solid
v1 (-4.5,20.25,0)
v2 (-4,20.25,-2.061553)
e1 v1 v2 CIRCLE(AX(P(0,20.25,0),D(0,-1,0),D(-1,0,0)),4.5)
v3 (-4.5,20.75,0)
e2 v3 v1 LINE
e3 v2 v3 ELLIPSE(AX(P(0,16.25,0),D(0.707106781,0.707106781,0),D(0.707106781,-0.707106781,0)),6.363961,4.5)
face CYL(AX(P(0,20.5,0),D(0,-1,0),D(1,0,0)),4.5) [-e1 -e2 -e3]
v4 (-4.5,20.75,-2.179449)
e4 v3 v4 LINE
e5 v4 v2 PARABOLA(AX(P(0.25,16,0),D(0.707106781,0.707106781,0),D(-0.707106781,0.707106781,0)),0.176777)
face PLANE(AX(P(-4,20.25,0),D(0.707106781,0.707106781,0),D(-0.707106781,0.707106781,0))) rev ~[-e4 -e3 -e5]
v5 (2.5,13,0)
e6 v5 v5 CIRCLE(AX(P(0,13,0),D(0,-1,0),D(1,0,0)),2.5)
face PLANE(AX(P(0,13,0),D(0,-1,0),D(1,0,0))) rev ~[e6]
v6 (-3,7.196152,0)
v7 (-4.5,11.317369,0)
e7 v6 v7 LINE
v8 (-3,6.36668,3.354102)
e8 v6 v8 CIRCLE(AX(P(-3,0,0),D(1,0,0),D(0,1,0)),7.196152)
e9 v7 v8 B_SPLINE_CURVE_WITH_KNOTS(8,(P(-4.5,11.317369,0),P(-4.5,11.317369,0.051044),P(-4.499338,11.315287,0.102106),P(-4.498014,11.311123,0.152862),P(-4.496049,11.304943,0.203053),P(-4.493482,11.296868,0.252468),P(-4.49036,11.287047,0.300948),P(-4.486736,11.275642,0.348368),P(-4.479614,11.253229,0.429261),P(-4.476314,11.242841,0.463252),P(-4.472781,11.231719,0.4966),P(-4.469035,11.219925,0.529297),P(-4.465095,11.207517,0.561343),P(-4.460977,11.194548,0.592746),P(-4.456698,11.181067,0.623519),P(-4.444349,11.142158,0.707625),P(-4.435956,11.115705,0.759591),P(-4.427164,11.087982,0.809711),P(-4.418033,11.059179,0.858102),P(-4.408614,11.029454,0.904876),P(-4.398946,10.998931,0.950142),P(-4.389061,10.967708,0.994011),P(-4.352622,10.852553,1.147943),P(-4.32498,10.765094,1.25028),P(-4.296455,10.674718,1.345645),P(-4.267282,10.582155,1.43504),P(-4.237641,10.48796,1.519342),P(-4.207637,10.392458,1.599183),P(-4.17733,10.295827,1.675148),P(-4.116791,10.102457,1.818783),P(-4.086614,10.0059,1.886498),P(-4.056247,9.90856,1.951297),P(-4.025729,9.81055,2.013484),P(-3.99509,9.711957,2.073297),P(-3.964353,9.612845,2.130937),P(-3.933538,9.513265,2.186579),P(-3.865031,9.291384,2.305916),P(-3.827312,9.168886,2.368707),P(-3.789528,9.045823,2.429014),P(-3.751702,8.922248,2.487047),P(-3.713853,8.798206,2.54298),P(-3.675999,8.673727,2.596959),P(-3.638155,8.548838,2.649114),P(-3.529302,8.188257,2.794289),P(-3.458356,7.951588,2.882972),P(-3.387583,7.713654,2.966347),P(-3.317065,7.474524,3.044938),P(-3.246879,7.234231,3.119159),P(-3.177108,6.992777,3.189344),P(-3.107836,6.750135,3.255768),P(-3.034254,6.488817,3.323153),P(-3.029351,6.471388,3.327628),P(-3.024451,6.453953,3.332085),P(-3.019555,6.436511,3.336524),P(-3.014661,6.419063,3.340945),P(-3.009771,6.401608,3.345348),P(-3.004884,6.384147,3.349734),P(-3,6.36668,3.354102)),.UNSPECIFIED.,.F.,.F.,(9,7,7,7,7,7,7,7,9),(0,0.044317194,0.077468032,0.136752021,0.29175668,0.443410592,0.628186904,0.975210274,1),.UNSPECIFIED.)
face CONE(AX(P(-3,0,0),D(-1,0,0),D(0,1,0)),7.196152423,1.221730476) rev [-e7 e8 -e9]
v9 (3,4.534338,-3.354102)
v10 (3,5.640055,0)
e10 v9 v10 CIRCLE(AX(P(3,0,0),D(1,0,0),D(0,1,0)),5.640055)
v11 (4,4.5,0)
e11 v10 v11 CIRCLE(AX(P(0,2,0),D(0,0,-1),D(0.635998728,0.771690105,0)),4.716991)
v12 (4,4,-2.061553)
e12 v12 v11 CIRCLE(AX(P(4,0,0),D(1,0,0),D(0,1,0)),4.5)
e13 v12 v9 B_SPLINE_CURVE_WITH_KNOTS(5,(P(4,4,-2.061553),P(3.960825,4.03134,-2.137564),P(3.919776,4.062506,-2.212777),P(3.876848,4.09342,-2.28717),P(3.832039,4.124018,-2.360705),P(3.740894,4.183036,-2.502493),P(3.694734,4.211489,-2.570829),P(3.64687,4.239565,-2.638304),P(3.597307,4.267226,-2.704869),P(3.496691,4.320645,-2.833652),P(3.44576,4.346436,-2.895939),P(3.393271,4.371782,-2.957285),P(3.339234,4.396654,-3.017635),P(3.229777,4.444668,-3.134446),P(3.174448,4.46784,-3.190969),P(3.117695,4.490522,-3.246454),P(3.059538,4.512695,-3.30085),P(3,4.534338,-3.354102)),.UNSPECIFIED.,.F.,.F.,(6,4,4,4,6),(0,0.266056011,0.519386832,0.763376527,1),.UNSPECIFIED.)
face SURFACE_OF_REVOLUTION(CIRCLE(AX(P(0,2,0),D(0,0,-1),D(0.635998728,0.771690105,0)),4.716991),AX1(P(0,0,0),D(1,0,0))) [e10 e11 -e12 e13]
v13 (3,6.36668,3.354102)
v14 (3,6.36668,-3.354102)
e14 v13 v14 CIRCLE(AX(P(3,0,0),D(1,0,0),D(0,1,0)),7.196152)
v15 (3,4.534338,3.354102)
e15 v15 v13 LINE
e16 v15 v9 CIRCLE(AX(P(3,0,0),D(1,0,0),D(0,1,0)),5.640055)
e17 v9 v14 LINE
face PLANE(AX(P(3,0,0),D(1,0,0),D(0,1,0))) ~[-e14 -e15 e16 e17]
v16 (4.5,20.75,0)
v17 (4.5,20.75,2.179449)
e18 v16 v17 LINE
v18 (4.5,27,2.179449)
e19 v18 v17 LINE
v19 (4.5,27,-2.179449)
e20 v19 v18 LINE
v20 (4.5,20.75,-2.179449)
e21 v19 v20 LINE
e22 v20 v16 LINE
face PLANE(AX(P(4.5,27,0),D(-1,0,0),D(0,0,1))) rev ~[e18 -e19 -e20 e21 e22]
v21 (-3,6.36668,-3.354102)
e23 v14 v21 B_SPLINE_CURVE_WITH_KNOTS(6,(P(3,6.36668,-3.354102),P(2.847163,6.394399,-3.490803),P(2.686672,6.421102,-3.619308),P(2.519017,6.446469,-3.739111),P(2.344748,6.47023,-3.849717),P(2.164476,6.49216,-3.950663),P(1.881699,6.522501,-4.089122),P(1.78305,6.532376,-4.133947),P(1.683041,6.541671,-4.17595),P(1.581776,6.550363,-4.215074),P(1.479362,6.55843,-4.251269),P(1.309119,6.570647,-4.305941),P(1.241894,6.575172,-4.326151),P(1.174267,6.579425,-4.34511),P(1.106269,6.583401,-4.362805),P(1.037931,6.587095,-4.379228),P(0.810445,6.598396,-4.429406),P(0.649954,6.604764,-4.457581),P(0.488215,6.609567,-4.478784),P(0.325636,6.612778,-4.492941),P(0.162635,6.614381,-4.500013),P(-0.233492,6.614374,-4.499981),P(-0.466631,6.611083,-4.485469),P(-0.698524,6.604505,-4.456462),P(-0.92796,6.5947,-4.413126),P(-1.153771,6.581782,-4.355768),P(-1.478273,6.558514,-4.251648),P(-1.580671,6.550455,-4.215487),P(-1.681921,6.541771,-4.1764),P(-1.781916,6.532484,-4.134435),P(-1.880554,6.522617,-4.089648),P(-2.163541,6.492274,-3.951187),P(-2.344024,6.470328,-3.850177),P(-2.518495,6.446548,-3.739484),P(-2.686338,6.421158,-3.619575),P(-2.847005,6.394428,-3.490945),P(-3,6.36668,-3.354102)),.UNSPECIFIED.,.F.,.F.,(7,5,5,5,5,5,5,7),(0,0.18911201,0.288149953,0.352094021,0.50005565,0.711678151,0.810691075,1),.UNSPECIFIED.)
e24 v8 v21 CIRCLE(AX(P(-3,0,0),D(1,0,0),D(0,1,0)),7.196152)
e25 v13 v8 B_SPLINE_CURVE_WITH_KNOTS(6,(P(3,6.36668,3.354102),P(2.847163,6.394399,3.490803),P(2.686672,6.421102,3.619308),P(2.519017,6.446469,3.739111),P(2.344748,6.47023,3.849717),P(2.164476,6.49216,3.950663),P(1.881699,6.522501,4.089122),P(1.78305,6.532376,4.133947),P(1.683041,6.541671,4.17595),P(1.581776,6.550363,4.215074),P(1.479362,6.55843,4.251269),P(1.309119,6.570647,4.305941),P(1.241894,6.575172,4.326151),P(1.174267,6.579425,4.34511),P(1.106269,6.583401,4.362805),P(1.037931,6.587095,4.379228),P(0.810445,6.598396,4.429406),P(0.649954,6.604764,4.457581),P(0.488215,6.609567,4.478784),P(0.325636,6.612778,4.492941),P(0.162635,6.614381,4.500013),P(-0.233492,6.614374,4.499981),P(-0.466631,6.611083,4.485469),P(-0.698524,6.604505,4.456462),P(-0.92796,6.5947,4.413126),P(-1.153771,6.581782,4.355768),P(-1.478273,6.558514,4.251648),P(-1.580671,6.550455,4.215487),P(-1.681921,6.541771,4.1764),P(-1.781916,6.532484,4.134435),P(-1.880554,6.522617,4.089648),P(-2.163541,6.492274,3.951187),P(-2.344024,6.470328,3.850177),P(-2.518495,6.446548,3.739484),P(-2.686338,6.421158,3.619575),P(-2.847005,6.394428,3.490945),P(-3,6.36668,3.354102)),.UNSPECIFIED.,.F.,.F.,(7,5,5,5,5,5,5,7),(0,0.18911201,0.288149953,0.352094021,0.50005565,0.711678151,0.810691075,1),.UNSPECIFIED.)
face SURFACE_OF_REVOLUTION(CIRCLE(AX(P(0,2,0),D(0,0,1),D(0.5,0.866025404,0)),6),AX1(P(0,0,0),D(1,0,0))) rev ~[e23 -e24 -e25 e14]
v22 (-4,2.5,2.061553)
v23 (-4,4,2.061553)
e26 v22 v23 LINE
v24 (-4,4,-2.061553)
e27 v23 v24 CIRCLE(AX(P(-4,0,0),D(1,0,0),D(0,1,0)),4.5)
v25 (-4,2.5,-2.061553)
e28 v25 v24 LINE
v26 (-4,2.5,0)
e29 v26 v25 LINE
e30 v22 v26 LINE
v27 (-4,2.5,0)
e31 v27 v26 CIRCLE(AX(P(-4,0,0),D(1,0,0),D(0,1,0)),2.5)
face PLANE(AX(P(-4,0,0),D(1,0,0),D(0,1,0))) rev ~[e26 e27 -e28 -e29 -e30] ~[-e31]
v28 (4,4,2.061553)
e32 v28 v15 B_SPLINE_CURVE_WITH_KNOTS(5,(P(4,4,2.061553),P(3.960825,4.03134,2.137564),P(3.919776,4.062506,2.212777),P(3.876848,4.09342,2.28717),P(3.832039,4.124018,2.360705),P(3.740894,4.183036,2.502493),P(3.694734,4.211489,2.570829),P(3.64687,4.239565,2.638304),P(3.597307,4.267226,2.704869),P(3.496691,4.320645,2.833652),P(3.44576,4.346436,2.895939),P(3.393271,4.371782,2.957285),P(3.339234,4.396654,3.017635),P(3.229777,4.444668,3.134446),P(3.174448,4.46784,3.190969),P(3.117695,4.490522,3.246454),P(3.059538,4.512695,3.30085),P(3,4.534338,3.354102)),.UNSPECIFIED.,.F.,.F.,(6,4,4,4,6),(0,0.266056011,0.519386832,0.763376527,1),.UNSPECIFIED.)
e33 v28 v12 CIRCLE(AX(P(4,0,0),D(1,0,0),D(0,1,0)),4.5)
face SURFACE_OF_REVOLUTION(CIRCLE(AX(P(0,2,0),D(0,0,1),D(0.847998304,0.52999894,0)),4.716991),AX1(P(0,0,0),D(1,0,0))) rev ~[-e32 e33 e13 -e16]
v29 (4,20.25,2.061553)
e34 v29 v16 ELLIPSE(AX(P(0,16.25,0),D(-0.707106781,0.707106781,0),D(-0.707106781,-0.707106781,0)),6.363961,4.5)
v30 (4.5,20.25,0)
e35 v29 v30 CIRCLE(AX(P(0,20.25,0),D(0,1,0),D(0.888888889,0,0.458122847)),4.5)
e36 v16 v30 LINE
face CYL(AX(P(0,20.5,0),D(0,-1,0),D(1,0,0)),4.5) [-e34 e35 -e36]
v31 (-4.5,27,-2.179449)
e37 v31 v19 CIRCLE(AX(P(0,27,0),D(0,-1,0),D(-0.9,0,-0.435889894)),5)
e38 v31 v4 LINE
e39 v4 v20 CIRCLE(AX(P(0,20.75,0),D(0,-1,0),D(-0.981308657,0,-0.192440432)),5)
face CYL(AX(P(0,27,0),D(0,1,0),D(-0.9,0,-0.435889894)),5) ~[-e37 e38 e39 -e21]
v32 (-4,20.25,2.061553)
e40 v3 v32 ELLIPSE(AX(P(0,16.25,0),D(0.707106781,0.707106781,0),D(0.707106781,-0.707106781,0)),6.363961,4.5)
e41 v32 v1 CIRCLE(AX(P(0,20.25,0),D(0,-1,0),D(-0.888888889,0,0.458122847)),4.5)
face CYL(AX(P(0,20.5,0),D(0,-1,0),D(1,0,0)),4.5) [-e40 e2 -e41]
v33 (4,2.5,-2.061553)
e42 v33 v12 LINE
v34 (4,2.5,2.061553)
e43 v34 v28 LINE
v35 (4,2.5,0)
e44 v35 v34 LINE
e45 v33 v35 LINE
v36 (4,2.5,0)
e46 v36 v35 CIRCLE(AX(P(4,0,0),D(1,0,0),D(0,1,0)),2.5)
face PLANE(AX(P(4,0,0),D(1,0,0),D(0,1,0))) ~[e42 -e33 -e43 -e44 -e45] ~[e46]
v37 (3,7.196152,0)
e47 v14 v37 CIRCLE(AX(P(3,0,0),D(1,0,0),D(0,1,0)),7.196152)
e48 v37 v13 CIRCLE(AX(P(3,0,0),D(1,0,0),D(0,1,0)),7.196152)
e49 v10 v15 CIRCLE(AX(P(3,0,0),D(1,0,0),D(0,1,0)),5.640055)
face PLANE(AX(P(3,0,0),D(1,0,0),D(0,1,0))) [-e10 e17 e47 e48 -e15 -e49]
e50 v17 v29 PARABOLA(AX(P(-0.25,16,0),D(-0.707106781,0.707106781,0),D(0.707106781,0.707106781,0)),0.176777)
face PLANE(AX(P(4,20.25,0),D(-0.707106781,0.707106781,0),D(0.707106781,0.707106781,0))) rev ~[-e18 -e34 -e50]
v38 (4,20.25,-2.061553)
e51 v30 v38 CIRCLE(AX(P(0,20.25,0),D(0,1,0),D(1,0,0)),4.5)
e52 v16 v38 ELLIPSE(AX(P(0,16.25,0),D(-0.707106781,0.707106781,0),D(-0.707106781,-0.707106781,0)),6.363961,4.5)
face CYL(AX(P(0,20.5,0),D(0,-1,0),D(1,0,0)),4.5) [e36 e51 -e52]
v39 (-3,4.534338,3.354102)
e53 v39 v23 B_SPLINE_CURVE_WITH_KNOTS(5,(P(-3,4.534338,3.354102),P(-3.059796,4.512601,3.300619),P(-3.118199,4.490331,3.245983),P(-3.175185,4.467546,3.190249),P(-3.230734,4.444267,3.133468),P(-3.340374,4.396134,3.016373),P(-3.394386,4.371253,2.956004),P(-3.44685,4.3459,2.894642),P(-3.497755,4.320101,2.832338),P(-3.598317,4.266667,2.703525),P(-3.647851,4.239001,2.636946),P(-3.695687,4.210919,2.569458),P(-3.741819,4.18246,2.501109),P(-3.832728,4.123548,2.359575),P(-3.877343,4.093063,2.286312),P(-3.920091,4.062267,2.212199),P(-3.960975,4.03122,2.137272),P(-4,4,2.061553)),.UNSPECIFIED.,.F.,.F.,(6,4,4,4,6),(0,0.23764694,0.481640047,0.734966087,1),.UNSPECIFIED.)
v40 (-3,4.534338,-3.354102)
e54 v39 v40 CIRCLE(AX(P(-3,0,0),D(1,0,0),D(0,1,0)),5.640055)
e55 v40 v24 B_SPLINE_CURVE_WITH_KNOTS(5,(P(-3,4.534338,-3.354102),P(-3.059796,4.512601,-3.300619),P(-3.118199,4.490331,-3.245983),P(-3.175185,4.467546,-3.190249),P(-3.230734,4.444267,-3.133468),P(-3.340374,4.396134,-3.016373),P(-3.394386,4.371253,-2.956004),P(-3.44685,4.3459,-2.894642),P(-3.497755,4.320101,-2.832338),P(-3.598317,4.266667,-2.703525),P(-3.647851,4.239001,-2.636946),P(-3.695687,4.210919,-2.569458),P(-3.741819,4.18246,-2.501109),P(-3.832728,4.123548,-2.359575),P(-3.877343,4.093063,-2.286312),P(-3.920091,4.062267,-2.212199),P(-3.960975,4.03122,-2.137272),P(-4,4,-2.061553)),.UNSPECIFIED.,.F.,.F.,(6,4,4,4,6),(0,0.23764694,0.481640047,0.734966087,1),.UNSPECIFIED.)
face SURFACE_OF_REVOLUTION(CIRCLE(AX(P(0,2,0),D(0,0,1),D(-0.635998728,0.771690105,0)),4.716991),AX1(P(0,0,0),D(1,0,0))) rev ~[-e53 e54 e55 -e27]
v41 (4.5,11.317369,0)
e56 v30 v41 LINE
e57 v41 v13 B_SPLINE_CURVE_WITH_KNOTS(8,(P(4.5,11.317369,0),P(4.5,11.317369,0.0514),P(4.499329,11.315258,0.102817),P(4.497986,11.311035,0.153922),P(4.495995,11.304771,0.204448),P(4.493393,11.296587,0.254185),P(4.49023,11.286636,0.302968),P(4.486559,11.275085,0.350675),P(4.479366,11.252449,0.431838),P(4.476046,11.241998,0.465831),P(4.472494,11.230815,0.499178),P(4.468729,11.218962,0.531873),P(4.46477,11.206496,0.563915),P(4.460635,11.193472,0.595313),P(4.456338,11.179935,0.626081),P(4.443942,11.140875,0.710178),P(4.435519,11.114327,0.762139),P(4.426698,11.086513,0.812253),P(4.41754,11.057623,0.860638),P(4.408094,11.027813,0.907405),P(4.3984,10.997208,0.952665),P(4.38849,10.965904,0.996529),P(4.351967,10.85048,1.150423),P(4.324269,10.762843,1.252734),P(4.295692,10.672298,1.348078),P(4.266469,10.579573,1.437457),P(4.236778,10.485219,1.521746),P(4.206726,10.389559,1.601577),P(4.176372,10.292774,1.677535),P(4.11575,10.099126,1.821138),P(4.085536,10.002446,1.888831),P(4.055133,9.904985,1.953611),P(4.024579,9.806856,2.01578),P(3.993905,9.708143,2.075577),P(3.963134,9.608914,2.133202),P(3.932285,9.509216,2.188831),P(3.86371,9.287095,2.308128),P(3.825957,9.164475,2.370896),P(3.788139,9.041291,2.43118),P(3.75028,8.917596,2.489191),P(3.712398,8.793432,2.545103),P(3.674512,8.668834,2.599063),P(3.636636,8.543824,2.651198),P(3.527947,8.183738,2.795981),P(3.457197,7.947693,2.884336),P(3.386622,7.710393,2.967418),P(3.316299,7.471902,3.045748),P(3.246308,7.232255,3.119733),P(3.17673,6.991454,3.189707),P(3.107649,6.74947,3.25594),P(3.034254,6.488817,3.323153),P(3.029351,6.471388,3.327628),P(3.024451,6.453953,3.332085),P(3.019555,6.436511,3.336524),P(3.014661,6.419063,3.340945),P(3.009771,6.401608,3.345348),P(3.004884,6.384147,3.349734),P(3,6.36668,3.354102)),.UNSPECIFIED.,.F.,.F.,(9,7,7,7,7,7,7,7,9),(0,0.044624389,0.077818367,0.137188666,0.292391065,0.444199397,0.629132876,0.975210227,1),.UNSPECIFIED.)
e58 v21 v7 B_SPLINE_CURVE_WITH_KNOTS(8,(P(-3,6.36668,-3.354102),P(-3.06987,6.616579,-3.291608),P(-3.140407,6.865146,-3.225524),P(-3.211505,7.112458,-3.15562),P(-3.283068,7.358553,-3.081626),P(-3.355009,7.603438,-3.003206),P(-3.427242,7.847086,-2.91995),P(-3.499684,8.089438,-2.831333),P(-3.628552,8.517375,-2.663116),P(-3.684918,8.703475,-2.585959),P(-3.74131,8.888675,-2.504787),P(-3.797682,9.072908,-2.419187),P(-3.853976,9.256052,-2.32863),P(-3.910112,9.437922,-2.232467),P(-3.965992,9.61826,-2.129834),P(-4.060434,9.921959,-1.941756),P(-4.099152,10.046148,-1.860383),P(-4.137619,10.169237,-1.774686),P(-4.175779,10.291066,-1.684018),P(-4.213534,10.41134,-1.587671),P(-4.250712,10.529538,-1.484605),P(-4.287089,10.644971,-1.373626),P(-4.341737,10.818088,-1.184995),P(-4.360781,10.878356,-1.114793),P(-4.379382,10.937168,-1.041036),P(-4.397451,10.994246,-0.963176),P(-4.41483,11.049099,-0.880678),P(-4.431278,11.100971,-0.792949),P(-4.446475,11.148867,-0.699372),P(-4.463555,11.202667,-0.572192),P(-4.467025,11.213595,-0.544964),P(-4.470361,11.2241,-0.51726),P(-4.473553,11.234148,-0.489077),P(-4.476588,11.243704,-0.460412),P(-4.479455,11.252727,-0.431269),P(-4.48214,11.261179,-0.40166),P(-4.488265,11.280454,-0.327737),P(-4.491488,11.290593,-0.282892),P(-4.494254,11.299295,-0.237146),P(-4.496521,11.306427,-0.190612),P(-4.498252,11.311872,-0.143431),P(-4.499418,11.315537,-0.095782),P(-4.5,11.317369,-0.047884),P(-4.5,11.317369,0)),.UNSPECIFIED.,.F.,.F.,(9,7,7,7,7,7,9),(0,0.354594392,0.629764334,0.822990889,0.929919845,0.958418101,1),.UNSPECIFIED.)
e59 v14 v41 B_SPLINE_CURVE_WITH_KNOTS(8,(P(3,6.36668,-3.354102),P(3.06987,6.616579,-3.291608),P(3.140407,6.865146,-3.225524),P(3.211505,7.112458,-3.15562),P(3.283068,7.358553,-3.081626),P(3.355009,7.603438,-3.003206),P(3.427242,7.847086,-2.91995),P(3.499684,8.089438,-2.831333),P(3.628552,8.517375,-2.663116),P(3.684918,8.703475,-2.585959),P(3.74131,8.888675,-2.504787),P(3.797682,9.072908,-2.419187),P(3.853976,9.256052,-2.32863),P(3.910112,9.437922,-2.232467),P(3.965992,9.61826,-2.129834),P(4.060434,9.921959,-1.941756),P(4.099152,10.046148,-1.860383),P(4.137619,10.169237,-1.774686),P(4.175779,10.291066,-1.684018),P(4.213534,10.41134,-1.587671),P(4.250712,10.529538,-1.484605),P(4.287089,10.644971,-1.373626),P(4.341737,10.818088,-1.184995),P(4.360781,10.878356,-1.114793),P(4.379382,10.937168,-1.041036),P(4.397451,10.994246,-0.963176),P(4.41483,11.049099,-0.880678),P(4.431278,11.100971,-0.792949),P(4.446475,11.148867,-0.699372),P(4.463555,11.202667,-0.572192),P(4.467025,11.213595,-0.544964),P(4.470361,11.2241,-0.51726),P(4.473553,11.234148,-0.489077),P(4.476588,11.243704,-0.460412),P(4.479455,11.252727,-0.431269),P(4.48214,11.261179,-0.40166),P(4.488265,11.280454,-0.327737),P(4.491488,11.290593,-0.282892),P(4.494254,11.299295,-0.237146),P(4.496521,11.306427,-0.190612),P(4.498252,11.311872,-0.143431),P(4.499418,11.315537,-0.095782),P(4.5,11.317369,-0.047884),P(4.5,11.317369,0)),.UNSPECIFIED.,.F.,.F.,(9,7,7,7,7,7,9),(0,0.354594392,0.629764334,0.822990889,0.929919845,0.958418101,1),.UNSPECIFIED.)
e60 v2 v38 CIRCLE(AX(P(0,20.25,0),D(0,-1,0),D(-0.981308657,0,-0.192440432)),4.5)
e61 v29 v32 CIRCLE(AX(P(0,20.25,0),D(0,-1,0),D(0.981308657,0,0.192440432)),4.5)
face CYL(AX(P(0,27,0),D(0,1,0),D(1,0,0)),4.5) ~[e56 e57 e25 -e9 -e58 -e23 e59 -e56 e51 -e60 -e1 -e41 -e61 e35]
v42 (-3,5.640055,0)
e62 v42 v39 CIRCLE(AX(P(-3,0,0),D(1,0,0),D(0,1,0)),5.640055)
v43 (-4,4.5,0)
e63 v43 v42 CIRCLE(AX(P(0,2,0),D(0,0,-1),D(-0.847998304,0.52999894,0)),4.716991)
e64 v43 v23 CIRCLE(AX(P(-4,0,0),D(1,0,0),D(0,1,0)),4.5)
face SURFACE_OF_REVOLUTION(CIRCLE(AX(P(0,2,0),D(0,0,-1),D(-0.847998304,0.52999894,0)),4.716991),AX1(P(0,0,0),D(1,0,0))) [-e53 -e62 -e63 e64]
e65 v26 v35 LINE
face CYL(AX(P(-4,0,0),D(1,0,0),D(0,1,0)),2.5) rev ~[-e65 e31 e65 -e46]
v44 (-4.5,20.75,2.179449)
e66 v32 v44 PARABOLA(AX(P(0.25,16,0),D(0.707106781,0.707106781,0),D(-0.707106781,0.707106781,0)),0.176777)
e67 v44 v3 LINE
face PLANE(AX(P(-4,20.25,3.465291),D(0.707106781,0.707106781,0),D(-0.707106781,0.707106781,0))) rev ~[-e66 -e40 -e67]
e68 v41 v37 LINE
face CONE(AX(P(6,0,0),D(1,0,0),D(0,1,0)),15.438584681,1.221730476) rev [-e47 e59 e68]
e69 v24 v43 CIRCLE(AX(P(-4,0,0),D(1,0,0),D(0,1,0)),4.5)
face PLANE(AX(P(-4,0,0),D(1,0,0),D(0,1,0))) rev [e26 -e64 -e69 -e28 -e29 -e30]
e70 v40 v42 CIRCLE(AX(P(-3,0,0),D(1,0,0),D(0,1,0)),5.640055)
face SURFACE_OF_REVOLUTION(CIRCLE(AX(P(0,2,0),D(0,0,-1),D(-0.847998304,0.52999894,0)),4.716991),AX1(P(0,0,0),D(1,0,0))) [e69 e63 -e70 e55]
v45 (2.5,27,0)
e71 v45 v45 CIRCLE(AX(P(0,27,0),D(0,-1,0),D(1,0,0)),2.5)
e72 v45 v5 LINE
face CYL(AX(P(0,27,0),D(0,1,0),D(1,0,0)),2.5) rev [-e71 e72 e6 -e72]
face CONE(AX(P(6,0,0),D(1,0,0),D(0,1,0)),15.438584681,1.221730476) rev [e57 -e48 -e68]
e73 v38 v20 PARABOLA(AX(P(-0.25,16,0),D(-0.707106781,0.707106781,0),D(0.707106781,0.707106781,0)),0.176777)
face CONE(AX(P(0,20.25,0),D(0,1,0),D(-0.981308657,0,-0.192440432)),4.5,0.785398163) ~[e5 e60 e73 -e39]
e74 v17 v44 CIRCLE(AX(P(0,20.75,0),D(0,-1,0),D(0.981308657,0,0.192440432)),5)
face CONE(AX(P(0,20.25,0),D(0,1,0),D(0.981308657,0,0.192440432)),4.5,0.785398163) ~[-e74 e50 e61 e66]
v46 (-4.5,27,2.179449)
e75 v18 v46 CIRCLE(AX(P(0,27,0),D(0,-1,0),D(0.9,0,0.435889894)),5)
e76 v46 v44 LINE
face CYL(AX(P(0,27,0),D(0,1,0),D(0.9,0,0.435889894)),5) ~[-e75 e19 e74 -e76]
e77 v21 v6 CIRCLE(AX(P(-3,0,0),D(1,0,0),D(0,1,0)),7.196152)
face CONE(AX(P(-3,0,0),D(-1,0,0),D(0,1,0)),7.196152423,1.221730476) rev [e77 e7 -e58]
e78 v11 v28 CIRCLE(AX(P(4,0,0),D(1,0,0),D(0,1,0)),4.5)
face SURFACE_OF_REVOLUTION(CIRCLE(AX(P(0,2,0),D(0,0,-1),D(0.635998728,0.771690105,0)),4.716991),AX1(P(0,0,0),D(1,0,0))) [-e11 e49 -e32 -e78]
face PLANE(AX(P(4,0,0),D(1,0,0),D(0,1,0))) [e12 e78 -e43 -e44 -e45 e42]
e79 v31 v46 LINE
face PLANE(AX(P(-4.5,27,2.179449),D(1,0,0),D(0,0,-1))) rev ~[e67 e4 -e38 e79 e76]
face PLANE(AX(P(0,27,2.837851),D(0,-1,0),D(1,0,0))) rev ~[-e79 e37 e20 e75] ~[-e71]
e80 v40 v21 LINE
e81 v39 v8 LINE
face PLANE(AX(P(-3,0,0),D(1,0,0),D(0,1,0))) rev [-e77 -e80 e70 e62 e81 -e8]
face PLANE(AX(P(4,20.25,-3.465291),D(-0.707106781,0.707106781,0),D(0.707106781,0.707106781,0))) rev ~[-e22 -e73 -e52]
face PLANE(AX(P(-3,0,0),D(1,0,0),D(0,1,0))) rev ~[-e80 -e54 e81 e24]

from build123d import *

# Parameters (mm, degrees)
F9_R          = 2.5
F10_DEPTH     = 24.5
F11_DEPTH     = 6.75
F12_DEPTH     = 14
F13_T2_ANGLE  = 157.8095212227
F13_T6_DEPTH  = 3.4652909658
F13_S7_R      = 4.5
F13_T8_DEPTH  = 3
F13_T12_DEPTH = 3.4652909658
F13_S13_R     = 4.5
F13_T14_DEPTH = 3
F13_T16_ANGLE = 157.8095212227
F13_T20_DEPTH = 3.4652909658
F13_S21_R     = 4.5
F13_T22_DEPTH = 3
F13_T26_DEPTH = 3.4652909658
F13_S27_R     = 4.5
F13_T28_DEPTH = 3


# Not quite as in the source:
# - a fillet or chamfer that OpenCascade refuses, or shapes differently, is made with other operations: its cross-section is extruded or revolved along the edge and cut away or added


with BuildPart() as f7:
    # F6 (on Top) → F7 (revolve)
    with BuildSketch(Plane.XY):
        with BuildLine():
            Line((-4, 4.5), (-4, 2.5))
            Line((-4, 2.5), (4, 2.5))
            Line((4, 2.5), (4, 4.5))
            ThreePointArc((4, 4.5), (3.5461149614, 5.1104772433), (3, 5.6400549446))
            ThreePointArc((3, 5.6400549446), (0, 6.716990566), (-3, 5.6400549446))
            ThreePointArc((-3, 5.6400549446), (-3.5461149614, 5.1104772433), (-4, 4.5))
        make_face()
        with BuildLine():
            Line((-3, 7.1961524227), (-3, 5.6400549446))
            ThreePointArc((-3, 5.6400549446), (0, 6.716990566), (3, 5.6400549446))
            Line((3, 5.6400549446), (3, 7.1961524227))
            ThreePointArc((3, 7.1961524227), (0, 8), (-3, 7.1961524227))
        make_face()
    revolve(axis=Axis((0, 0, 0), (1, 0, 0)))

    # F9 (on offset) → F10 (join)
    with BuildSketch(Plane.XZ.offset(-27)):
        with BuildLine():
            ThreePointArc((-4.5, 0), (0, -4.5), (4.5, 0))
            ThreePointArc((4.5, 0), (0, 4.5), (-4.5, 0))
        make_face()
        Circle(F9_R, mode=Mode.SUBTRACT)
        Circle(F9_R)
    extrude(amount=F10_DEPTH)

    # F9 (on offset) → F11 (join)
    with BuildSketch(Plane.XZ.offset(-27)):
        with BuildLine():
            ThreePointArc((-4.5, 0), (0, 4.5), (4.5, 0))
            Line((4.5, 0), (4.5, 2.1794494718))
            ThreePointArc((4.5, 2.1794494718), (0, 5), (-4.5, 2.1794494718))
            Line((-4.5, 2.1794494718), (-4.5, 0))
        make_face()
        with BuildLine():
            Line((4.5, -2.1794494718), (4.5, 0))
            ThreePointArc((4.5, 0), (0, -4.5), (-4.5, 0))
            Line((-4.5, 0), (-4.5, -2.1794494718))
            ThreePointArc((-4.5, -2.1794494718), (0, -5), (4.5, -2.1794494718))
        make_face()
    extrude(amount=F11_DEPTH)

    # F9 (on offset) → F12 (cut)
    with BuildSketch(Plane.XZ.offset(-27)):
        Circle(F9_R)
    extrude(amount=F12_DEPTH, mode=Mode.SUBTRACT)

    # F13: chamfer of 0.5 on 6 edges, made by hand

    # F13_s1 → F13_t2 (revolve, cut)
    with BuildSketch(Plane(origin=(0, 0, 0), x_dir=(0, 1, 0), z_dir=(0.1924404319, 0, -0.9813086569))):
        Polygon((20.25, 4.5), (20.75, 5), (20.25, 5), align=None)
    revolve(axis=Axis((0, 20.25, 0), (0, -1, 0)), revolution_arc=F13_T2_ANGLE, mode=Mode.SUBTRACT)


with BuildPart() as f13_tool4:
    # F13_s5 → F13_t6 (new body)
    with BuildSketch(Plane.XY):
        Polygon((4, 20.25), (4.5, 20.75), (4.5, 20.25), align=None)
    extrude(amount=F13_T6_DEPTH)

    # F13_s7 → F13_t8 (cut, symmetric)
    with BuildSketch(Plane.XZ.offset(-20.5)):
        Circle(F13_S7_R)
    extrude(amount=F13_T8_DEPTH, both=True, mode=Mode.SUBTRACT)


with BuildPart() as f7_1:
    add(f7.part)

    # F13_t3: cut F13_tool4
    add(f13_tool4.part, mode=Mode.SUBTRACT)


with BuildPart() as f13_tool10:
    # F13_s11 → F13_t12 (new body)
    with BuildSketch(Plane.XY.offset(3.4652909658)):
        Polygon((-4, 20.25), (-4.5, 20.75), (-4.5, 20.25), align=None)
    extrude(amount=-F13_T12_DEPTH)

    # F13_s13 → F13_t14 (cut, symmetric)
    with BuildSketch(Plane.XZ.offset(-20.5)):
        Circle(F13_S13_R)
    extrude(amount=F13_T14_DEPTH, both=True, mode=Mode.SUBTRACT)


with BuildPart() as f7_2:
    add(f7_1.part)

    # F13_t9: cut F13_tool10
    add(f13_tool10.part, mode=Mode.SUBTRACT)

    # F13_s15 → F13_t16 (revolve, cut)
    with BuildSketch(Plane(origin=(0, 0, 0), x_dir=(0, 1, 0), z_dir=(-0.1924404319, 0, 0.9813086569))):
        Polygon((20.25, 4.5), (20.75, 5), (20.25, 5), align=None)
    revolve(axis=Axis((0, 20.25, 0), (0, -1, 0)), revolution_arc=F13_T16_ANGLE, mode=Mode.SUBTRACT)


with BuildPart() as f13_tool18:
    # F13_s19 → F13_t20 (new body)
    with BuildSketch(Plane.XY.offset(-3.4652909658)):
        Polygon((4, 20.25), (4.5, 20.75), (4.5, 20.25), align=None)
    extrude(amount=F13_T20_DEPTH)

    # F13_s21 → F13_t22 (cut, symmetric)
    with BuildSketch(Plane.XZ.offset(-20.5)):
        Circle(F13_S21_R)
    extrude(amount=F13_T22_DEPTH, both=True, mode=Mode.SUBTRACT)


with BuildPart() as f7_3:
    add(f7_2.part)

    # F13_t17: cut F13_tool18
    add(f13_tool18.part, mode=Mode.SUBTRACT)


with BuildPart() as f13_tool24:
    # F13_s25 → F13_t26 (new body)
    with BuildSketch(Plane.XY):
        Polygon((-4, 20.25), (-4.5, 20.75), (-4.5, 20.25), align=None)
    extrude(amount=-F13_T26_DEPTH)

    # F13_s27 → F13_t28 (cut, symmetric)
    with BuildSketch(Plane.XZ.offset(-20.5)):
        Circle(F13_S27_R)
    extrude(amount=F13_T28_DEPTH, both=True, mode=Mode.SUBTRACT)


with BuildPart() as f7_4:
    add(f7_3.part)

    # F13_t23: cut F13_tool24
    add(f13_tool24.part, mode=Mode.SUBTRACT)

    # F6 (on Top) → F14 (revolve, cut)
    with BuildSketch(Plane.XY):
        with BuildLine():
            Line((4, 4.5), (4, 2.5))
            Line((4, 2.5), (6, 2.5))
            Line((6, 2.5), (6, 15.4385846811))
            Line((6, 15.4385846811), (3, 7.1961524227))
            Line((3, 7.1961524227), (3, 5.6400549446))
            ThreePointArc((3, 5.6400549446), (3.5461149614, 5.1104772433), (4, 4.5))
        make_face()
        with BuildLine():
            Line((-6, 2.5), (-4, 2.5))
            Line((-4, 2.5), (-4, 4.5))
            ThreePointArc((-4, 4.5), (-3.5461149614, 5.1104772433), (-3, 5.6400549446))
            Line((-3, 5.6400549446), (-3, 7.1961524227))
            Line((-3, 7.1961524227), (-6, 15.4385846811))
            Line((-6, 15.4385846811), (-6, 2.5))
        make_face()
    revolve(axis=Axis((0, 0, 0), (1, 0, 0)), mode=Mode.SUBTRACT)


solid = f7_4.part
